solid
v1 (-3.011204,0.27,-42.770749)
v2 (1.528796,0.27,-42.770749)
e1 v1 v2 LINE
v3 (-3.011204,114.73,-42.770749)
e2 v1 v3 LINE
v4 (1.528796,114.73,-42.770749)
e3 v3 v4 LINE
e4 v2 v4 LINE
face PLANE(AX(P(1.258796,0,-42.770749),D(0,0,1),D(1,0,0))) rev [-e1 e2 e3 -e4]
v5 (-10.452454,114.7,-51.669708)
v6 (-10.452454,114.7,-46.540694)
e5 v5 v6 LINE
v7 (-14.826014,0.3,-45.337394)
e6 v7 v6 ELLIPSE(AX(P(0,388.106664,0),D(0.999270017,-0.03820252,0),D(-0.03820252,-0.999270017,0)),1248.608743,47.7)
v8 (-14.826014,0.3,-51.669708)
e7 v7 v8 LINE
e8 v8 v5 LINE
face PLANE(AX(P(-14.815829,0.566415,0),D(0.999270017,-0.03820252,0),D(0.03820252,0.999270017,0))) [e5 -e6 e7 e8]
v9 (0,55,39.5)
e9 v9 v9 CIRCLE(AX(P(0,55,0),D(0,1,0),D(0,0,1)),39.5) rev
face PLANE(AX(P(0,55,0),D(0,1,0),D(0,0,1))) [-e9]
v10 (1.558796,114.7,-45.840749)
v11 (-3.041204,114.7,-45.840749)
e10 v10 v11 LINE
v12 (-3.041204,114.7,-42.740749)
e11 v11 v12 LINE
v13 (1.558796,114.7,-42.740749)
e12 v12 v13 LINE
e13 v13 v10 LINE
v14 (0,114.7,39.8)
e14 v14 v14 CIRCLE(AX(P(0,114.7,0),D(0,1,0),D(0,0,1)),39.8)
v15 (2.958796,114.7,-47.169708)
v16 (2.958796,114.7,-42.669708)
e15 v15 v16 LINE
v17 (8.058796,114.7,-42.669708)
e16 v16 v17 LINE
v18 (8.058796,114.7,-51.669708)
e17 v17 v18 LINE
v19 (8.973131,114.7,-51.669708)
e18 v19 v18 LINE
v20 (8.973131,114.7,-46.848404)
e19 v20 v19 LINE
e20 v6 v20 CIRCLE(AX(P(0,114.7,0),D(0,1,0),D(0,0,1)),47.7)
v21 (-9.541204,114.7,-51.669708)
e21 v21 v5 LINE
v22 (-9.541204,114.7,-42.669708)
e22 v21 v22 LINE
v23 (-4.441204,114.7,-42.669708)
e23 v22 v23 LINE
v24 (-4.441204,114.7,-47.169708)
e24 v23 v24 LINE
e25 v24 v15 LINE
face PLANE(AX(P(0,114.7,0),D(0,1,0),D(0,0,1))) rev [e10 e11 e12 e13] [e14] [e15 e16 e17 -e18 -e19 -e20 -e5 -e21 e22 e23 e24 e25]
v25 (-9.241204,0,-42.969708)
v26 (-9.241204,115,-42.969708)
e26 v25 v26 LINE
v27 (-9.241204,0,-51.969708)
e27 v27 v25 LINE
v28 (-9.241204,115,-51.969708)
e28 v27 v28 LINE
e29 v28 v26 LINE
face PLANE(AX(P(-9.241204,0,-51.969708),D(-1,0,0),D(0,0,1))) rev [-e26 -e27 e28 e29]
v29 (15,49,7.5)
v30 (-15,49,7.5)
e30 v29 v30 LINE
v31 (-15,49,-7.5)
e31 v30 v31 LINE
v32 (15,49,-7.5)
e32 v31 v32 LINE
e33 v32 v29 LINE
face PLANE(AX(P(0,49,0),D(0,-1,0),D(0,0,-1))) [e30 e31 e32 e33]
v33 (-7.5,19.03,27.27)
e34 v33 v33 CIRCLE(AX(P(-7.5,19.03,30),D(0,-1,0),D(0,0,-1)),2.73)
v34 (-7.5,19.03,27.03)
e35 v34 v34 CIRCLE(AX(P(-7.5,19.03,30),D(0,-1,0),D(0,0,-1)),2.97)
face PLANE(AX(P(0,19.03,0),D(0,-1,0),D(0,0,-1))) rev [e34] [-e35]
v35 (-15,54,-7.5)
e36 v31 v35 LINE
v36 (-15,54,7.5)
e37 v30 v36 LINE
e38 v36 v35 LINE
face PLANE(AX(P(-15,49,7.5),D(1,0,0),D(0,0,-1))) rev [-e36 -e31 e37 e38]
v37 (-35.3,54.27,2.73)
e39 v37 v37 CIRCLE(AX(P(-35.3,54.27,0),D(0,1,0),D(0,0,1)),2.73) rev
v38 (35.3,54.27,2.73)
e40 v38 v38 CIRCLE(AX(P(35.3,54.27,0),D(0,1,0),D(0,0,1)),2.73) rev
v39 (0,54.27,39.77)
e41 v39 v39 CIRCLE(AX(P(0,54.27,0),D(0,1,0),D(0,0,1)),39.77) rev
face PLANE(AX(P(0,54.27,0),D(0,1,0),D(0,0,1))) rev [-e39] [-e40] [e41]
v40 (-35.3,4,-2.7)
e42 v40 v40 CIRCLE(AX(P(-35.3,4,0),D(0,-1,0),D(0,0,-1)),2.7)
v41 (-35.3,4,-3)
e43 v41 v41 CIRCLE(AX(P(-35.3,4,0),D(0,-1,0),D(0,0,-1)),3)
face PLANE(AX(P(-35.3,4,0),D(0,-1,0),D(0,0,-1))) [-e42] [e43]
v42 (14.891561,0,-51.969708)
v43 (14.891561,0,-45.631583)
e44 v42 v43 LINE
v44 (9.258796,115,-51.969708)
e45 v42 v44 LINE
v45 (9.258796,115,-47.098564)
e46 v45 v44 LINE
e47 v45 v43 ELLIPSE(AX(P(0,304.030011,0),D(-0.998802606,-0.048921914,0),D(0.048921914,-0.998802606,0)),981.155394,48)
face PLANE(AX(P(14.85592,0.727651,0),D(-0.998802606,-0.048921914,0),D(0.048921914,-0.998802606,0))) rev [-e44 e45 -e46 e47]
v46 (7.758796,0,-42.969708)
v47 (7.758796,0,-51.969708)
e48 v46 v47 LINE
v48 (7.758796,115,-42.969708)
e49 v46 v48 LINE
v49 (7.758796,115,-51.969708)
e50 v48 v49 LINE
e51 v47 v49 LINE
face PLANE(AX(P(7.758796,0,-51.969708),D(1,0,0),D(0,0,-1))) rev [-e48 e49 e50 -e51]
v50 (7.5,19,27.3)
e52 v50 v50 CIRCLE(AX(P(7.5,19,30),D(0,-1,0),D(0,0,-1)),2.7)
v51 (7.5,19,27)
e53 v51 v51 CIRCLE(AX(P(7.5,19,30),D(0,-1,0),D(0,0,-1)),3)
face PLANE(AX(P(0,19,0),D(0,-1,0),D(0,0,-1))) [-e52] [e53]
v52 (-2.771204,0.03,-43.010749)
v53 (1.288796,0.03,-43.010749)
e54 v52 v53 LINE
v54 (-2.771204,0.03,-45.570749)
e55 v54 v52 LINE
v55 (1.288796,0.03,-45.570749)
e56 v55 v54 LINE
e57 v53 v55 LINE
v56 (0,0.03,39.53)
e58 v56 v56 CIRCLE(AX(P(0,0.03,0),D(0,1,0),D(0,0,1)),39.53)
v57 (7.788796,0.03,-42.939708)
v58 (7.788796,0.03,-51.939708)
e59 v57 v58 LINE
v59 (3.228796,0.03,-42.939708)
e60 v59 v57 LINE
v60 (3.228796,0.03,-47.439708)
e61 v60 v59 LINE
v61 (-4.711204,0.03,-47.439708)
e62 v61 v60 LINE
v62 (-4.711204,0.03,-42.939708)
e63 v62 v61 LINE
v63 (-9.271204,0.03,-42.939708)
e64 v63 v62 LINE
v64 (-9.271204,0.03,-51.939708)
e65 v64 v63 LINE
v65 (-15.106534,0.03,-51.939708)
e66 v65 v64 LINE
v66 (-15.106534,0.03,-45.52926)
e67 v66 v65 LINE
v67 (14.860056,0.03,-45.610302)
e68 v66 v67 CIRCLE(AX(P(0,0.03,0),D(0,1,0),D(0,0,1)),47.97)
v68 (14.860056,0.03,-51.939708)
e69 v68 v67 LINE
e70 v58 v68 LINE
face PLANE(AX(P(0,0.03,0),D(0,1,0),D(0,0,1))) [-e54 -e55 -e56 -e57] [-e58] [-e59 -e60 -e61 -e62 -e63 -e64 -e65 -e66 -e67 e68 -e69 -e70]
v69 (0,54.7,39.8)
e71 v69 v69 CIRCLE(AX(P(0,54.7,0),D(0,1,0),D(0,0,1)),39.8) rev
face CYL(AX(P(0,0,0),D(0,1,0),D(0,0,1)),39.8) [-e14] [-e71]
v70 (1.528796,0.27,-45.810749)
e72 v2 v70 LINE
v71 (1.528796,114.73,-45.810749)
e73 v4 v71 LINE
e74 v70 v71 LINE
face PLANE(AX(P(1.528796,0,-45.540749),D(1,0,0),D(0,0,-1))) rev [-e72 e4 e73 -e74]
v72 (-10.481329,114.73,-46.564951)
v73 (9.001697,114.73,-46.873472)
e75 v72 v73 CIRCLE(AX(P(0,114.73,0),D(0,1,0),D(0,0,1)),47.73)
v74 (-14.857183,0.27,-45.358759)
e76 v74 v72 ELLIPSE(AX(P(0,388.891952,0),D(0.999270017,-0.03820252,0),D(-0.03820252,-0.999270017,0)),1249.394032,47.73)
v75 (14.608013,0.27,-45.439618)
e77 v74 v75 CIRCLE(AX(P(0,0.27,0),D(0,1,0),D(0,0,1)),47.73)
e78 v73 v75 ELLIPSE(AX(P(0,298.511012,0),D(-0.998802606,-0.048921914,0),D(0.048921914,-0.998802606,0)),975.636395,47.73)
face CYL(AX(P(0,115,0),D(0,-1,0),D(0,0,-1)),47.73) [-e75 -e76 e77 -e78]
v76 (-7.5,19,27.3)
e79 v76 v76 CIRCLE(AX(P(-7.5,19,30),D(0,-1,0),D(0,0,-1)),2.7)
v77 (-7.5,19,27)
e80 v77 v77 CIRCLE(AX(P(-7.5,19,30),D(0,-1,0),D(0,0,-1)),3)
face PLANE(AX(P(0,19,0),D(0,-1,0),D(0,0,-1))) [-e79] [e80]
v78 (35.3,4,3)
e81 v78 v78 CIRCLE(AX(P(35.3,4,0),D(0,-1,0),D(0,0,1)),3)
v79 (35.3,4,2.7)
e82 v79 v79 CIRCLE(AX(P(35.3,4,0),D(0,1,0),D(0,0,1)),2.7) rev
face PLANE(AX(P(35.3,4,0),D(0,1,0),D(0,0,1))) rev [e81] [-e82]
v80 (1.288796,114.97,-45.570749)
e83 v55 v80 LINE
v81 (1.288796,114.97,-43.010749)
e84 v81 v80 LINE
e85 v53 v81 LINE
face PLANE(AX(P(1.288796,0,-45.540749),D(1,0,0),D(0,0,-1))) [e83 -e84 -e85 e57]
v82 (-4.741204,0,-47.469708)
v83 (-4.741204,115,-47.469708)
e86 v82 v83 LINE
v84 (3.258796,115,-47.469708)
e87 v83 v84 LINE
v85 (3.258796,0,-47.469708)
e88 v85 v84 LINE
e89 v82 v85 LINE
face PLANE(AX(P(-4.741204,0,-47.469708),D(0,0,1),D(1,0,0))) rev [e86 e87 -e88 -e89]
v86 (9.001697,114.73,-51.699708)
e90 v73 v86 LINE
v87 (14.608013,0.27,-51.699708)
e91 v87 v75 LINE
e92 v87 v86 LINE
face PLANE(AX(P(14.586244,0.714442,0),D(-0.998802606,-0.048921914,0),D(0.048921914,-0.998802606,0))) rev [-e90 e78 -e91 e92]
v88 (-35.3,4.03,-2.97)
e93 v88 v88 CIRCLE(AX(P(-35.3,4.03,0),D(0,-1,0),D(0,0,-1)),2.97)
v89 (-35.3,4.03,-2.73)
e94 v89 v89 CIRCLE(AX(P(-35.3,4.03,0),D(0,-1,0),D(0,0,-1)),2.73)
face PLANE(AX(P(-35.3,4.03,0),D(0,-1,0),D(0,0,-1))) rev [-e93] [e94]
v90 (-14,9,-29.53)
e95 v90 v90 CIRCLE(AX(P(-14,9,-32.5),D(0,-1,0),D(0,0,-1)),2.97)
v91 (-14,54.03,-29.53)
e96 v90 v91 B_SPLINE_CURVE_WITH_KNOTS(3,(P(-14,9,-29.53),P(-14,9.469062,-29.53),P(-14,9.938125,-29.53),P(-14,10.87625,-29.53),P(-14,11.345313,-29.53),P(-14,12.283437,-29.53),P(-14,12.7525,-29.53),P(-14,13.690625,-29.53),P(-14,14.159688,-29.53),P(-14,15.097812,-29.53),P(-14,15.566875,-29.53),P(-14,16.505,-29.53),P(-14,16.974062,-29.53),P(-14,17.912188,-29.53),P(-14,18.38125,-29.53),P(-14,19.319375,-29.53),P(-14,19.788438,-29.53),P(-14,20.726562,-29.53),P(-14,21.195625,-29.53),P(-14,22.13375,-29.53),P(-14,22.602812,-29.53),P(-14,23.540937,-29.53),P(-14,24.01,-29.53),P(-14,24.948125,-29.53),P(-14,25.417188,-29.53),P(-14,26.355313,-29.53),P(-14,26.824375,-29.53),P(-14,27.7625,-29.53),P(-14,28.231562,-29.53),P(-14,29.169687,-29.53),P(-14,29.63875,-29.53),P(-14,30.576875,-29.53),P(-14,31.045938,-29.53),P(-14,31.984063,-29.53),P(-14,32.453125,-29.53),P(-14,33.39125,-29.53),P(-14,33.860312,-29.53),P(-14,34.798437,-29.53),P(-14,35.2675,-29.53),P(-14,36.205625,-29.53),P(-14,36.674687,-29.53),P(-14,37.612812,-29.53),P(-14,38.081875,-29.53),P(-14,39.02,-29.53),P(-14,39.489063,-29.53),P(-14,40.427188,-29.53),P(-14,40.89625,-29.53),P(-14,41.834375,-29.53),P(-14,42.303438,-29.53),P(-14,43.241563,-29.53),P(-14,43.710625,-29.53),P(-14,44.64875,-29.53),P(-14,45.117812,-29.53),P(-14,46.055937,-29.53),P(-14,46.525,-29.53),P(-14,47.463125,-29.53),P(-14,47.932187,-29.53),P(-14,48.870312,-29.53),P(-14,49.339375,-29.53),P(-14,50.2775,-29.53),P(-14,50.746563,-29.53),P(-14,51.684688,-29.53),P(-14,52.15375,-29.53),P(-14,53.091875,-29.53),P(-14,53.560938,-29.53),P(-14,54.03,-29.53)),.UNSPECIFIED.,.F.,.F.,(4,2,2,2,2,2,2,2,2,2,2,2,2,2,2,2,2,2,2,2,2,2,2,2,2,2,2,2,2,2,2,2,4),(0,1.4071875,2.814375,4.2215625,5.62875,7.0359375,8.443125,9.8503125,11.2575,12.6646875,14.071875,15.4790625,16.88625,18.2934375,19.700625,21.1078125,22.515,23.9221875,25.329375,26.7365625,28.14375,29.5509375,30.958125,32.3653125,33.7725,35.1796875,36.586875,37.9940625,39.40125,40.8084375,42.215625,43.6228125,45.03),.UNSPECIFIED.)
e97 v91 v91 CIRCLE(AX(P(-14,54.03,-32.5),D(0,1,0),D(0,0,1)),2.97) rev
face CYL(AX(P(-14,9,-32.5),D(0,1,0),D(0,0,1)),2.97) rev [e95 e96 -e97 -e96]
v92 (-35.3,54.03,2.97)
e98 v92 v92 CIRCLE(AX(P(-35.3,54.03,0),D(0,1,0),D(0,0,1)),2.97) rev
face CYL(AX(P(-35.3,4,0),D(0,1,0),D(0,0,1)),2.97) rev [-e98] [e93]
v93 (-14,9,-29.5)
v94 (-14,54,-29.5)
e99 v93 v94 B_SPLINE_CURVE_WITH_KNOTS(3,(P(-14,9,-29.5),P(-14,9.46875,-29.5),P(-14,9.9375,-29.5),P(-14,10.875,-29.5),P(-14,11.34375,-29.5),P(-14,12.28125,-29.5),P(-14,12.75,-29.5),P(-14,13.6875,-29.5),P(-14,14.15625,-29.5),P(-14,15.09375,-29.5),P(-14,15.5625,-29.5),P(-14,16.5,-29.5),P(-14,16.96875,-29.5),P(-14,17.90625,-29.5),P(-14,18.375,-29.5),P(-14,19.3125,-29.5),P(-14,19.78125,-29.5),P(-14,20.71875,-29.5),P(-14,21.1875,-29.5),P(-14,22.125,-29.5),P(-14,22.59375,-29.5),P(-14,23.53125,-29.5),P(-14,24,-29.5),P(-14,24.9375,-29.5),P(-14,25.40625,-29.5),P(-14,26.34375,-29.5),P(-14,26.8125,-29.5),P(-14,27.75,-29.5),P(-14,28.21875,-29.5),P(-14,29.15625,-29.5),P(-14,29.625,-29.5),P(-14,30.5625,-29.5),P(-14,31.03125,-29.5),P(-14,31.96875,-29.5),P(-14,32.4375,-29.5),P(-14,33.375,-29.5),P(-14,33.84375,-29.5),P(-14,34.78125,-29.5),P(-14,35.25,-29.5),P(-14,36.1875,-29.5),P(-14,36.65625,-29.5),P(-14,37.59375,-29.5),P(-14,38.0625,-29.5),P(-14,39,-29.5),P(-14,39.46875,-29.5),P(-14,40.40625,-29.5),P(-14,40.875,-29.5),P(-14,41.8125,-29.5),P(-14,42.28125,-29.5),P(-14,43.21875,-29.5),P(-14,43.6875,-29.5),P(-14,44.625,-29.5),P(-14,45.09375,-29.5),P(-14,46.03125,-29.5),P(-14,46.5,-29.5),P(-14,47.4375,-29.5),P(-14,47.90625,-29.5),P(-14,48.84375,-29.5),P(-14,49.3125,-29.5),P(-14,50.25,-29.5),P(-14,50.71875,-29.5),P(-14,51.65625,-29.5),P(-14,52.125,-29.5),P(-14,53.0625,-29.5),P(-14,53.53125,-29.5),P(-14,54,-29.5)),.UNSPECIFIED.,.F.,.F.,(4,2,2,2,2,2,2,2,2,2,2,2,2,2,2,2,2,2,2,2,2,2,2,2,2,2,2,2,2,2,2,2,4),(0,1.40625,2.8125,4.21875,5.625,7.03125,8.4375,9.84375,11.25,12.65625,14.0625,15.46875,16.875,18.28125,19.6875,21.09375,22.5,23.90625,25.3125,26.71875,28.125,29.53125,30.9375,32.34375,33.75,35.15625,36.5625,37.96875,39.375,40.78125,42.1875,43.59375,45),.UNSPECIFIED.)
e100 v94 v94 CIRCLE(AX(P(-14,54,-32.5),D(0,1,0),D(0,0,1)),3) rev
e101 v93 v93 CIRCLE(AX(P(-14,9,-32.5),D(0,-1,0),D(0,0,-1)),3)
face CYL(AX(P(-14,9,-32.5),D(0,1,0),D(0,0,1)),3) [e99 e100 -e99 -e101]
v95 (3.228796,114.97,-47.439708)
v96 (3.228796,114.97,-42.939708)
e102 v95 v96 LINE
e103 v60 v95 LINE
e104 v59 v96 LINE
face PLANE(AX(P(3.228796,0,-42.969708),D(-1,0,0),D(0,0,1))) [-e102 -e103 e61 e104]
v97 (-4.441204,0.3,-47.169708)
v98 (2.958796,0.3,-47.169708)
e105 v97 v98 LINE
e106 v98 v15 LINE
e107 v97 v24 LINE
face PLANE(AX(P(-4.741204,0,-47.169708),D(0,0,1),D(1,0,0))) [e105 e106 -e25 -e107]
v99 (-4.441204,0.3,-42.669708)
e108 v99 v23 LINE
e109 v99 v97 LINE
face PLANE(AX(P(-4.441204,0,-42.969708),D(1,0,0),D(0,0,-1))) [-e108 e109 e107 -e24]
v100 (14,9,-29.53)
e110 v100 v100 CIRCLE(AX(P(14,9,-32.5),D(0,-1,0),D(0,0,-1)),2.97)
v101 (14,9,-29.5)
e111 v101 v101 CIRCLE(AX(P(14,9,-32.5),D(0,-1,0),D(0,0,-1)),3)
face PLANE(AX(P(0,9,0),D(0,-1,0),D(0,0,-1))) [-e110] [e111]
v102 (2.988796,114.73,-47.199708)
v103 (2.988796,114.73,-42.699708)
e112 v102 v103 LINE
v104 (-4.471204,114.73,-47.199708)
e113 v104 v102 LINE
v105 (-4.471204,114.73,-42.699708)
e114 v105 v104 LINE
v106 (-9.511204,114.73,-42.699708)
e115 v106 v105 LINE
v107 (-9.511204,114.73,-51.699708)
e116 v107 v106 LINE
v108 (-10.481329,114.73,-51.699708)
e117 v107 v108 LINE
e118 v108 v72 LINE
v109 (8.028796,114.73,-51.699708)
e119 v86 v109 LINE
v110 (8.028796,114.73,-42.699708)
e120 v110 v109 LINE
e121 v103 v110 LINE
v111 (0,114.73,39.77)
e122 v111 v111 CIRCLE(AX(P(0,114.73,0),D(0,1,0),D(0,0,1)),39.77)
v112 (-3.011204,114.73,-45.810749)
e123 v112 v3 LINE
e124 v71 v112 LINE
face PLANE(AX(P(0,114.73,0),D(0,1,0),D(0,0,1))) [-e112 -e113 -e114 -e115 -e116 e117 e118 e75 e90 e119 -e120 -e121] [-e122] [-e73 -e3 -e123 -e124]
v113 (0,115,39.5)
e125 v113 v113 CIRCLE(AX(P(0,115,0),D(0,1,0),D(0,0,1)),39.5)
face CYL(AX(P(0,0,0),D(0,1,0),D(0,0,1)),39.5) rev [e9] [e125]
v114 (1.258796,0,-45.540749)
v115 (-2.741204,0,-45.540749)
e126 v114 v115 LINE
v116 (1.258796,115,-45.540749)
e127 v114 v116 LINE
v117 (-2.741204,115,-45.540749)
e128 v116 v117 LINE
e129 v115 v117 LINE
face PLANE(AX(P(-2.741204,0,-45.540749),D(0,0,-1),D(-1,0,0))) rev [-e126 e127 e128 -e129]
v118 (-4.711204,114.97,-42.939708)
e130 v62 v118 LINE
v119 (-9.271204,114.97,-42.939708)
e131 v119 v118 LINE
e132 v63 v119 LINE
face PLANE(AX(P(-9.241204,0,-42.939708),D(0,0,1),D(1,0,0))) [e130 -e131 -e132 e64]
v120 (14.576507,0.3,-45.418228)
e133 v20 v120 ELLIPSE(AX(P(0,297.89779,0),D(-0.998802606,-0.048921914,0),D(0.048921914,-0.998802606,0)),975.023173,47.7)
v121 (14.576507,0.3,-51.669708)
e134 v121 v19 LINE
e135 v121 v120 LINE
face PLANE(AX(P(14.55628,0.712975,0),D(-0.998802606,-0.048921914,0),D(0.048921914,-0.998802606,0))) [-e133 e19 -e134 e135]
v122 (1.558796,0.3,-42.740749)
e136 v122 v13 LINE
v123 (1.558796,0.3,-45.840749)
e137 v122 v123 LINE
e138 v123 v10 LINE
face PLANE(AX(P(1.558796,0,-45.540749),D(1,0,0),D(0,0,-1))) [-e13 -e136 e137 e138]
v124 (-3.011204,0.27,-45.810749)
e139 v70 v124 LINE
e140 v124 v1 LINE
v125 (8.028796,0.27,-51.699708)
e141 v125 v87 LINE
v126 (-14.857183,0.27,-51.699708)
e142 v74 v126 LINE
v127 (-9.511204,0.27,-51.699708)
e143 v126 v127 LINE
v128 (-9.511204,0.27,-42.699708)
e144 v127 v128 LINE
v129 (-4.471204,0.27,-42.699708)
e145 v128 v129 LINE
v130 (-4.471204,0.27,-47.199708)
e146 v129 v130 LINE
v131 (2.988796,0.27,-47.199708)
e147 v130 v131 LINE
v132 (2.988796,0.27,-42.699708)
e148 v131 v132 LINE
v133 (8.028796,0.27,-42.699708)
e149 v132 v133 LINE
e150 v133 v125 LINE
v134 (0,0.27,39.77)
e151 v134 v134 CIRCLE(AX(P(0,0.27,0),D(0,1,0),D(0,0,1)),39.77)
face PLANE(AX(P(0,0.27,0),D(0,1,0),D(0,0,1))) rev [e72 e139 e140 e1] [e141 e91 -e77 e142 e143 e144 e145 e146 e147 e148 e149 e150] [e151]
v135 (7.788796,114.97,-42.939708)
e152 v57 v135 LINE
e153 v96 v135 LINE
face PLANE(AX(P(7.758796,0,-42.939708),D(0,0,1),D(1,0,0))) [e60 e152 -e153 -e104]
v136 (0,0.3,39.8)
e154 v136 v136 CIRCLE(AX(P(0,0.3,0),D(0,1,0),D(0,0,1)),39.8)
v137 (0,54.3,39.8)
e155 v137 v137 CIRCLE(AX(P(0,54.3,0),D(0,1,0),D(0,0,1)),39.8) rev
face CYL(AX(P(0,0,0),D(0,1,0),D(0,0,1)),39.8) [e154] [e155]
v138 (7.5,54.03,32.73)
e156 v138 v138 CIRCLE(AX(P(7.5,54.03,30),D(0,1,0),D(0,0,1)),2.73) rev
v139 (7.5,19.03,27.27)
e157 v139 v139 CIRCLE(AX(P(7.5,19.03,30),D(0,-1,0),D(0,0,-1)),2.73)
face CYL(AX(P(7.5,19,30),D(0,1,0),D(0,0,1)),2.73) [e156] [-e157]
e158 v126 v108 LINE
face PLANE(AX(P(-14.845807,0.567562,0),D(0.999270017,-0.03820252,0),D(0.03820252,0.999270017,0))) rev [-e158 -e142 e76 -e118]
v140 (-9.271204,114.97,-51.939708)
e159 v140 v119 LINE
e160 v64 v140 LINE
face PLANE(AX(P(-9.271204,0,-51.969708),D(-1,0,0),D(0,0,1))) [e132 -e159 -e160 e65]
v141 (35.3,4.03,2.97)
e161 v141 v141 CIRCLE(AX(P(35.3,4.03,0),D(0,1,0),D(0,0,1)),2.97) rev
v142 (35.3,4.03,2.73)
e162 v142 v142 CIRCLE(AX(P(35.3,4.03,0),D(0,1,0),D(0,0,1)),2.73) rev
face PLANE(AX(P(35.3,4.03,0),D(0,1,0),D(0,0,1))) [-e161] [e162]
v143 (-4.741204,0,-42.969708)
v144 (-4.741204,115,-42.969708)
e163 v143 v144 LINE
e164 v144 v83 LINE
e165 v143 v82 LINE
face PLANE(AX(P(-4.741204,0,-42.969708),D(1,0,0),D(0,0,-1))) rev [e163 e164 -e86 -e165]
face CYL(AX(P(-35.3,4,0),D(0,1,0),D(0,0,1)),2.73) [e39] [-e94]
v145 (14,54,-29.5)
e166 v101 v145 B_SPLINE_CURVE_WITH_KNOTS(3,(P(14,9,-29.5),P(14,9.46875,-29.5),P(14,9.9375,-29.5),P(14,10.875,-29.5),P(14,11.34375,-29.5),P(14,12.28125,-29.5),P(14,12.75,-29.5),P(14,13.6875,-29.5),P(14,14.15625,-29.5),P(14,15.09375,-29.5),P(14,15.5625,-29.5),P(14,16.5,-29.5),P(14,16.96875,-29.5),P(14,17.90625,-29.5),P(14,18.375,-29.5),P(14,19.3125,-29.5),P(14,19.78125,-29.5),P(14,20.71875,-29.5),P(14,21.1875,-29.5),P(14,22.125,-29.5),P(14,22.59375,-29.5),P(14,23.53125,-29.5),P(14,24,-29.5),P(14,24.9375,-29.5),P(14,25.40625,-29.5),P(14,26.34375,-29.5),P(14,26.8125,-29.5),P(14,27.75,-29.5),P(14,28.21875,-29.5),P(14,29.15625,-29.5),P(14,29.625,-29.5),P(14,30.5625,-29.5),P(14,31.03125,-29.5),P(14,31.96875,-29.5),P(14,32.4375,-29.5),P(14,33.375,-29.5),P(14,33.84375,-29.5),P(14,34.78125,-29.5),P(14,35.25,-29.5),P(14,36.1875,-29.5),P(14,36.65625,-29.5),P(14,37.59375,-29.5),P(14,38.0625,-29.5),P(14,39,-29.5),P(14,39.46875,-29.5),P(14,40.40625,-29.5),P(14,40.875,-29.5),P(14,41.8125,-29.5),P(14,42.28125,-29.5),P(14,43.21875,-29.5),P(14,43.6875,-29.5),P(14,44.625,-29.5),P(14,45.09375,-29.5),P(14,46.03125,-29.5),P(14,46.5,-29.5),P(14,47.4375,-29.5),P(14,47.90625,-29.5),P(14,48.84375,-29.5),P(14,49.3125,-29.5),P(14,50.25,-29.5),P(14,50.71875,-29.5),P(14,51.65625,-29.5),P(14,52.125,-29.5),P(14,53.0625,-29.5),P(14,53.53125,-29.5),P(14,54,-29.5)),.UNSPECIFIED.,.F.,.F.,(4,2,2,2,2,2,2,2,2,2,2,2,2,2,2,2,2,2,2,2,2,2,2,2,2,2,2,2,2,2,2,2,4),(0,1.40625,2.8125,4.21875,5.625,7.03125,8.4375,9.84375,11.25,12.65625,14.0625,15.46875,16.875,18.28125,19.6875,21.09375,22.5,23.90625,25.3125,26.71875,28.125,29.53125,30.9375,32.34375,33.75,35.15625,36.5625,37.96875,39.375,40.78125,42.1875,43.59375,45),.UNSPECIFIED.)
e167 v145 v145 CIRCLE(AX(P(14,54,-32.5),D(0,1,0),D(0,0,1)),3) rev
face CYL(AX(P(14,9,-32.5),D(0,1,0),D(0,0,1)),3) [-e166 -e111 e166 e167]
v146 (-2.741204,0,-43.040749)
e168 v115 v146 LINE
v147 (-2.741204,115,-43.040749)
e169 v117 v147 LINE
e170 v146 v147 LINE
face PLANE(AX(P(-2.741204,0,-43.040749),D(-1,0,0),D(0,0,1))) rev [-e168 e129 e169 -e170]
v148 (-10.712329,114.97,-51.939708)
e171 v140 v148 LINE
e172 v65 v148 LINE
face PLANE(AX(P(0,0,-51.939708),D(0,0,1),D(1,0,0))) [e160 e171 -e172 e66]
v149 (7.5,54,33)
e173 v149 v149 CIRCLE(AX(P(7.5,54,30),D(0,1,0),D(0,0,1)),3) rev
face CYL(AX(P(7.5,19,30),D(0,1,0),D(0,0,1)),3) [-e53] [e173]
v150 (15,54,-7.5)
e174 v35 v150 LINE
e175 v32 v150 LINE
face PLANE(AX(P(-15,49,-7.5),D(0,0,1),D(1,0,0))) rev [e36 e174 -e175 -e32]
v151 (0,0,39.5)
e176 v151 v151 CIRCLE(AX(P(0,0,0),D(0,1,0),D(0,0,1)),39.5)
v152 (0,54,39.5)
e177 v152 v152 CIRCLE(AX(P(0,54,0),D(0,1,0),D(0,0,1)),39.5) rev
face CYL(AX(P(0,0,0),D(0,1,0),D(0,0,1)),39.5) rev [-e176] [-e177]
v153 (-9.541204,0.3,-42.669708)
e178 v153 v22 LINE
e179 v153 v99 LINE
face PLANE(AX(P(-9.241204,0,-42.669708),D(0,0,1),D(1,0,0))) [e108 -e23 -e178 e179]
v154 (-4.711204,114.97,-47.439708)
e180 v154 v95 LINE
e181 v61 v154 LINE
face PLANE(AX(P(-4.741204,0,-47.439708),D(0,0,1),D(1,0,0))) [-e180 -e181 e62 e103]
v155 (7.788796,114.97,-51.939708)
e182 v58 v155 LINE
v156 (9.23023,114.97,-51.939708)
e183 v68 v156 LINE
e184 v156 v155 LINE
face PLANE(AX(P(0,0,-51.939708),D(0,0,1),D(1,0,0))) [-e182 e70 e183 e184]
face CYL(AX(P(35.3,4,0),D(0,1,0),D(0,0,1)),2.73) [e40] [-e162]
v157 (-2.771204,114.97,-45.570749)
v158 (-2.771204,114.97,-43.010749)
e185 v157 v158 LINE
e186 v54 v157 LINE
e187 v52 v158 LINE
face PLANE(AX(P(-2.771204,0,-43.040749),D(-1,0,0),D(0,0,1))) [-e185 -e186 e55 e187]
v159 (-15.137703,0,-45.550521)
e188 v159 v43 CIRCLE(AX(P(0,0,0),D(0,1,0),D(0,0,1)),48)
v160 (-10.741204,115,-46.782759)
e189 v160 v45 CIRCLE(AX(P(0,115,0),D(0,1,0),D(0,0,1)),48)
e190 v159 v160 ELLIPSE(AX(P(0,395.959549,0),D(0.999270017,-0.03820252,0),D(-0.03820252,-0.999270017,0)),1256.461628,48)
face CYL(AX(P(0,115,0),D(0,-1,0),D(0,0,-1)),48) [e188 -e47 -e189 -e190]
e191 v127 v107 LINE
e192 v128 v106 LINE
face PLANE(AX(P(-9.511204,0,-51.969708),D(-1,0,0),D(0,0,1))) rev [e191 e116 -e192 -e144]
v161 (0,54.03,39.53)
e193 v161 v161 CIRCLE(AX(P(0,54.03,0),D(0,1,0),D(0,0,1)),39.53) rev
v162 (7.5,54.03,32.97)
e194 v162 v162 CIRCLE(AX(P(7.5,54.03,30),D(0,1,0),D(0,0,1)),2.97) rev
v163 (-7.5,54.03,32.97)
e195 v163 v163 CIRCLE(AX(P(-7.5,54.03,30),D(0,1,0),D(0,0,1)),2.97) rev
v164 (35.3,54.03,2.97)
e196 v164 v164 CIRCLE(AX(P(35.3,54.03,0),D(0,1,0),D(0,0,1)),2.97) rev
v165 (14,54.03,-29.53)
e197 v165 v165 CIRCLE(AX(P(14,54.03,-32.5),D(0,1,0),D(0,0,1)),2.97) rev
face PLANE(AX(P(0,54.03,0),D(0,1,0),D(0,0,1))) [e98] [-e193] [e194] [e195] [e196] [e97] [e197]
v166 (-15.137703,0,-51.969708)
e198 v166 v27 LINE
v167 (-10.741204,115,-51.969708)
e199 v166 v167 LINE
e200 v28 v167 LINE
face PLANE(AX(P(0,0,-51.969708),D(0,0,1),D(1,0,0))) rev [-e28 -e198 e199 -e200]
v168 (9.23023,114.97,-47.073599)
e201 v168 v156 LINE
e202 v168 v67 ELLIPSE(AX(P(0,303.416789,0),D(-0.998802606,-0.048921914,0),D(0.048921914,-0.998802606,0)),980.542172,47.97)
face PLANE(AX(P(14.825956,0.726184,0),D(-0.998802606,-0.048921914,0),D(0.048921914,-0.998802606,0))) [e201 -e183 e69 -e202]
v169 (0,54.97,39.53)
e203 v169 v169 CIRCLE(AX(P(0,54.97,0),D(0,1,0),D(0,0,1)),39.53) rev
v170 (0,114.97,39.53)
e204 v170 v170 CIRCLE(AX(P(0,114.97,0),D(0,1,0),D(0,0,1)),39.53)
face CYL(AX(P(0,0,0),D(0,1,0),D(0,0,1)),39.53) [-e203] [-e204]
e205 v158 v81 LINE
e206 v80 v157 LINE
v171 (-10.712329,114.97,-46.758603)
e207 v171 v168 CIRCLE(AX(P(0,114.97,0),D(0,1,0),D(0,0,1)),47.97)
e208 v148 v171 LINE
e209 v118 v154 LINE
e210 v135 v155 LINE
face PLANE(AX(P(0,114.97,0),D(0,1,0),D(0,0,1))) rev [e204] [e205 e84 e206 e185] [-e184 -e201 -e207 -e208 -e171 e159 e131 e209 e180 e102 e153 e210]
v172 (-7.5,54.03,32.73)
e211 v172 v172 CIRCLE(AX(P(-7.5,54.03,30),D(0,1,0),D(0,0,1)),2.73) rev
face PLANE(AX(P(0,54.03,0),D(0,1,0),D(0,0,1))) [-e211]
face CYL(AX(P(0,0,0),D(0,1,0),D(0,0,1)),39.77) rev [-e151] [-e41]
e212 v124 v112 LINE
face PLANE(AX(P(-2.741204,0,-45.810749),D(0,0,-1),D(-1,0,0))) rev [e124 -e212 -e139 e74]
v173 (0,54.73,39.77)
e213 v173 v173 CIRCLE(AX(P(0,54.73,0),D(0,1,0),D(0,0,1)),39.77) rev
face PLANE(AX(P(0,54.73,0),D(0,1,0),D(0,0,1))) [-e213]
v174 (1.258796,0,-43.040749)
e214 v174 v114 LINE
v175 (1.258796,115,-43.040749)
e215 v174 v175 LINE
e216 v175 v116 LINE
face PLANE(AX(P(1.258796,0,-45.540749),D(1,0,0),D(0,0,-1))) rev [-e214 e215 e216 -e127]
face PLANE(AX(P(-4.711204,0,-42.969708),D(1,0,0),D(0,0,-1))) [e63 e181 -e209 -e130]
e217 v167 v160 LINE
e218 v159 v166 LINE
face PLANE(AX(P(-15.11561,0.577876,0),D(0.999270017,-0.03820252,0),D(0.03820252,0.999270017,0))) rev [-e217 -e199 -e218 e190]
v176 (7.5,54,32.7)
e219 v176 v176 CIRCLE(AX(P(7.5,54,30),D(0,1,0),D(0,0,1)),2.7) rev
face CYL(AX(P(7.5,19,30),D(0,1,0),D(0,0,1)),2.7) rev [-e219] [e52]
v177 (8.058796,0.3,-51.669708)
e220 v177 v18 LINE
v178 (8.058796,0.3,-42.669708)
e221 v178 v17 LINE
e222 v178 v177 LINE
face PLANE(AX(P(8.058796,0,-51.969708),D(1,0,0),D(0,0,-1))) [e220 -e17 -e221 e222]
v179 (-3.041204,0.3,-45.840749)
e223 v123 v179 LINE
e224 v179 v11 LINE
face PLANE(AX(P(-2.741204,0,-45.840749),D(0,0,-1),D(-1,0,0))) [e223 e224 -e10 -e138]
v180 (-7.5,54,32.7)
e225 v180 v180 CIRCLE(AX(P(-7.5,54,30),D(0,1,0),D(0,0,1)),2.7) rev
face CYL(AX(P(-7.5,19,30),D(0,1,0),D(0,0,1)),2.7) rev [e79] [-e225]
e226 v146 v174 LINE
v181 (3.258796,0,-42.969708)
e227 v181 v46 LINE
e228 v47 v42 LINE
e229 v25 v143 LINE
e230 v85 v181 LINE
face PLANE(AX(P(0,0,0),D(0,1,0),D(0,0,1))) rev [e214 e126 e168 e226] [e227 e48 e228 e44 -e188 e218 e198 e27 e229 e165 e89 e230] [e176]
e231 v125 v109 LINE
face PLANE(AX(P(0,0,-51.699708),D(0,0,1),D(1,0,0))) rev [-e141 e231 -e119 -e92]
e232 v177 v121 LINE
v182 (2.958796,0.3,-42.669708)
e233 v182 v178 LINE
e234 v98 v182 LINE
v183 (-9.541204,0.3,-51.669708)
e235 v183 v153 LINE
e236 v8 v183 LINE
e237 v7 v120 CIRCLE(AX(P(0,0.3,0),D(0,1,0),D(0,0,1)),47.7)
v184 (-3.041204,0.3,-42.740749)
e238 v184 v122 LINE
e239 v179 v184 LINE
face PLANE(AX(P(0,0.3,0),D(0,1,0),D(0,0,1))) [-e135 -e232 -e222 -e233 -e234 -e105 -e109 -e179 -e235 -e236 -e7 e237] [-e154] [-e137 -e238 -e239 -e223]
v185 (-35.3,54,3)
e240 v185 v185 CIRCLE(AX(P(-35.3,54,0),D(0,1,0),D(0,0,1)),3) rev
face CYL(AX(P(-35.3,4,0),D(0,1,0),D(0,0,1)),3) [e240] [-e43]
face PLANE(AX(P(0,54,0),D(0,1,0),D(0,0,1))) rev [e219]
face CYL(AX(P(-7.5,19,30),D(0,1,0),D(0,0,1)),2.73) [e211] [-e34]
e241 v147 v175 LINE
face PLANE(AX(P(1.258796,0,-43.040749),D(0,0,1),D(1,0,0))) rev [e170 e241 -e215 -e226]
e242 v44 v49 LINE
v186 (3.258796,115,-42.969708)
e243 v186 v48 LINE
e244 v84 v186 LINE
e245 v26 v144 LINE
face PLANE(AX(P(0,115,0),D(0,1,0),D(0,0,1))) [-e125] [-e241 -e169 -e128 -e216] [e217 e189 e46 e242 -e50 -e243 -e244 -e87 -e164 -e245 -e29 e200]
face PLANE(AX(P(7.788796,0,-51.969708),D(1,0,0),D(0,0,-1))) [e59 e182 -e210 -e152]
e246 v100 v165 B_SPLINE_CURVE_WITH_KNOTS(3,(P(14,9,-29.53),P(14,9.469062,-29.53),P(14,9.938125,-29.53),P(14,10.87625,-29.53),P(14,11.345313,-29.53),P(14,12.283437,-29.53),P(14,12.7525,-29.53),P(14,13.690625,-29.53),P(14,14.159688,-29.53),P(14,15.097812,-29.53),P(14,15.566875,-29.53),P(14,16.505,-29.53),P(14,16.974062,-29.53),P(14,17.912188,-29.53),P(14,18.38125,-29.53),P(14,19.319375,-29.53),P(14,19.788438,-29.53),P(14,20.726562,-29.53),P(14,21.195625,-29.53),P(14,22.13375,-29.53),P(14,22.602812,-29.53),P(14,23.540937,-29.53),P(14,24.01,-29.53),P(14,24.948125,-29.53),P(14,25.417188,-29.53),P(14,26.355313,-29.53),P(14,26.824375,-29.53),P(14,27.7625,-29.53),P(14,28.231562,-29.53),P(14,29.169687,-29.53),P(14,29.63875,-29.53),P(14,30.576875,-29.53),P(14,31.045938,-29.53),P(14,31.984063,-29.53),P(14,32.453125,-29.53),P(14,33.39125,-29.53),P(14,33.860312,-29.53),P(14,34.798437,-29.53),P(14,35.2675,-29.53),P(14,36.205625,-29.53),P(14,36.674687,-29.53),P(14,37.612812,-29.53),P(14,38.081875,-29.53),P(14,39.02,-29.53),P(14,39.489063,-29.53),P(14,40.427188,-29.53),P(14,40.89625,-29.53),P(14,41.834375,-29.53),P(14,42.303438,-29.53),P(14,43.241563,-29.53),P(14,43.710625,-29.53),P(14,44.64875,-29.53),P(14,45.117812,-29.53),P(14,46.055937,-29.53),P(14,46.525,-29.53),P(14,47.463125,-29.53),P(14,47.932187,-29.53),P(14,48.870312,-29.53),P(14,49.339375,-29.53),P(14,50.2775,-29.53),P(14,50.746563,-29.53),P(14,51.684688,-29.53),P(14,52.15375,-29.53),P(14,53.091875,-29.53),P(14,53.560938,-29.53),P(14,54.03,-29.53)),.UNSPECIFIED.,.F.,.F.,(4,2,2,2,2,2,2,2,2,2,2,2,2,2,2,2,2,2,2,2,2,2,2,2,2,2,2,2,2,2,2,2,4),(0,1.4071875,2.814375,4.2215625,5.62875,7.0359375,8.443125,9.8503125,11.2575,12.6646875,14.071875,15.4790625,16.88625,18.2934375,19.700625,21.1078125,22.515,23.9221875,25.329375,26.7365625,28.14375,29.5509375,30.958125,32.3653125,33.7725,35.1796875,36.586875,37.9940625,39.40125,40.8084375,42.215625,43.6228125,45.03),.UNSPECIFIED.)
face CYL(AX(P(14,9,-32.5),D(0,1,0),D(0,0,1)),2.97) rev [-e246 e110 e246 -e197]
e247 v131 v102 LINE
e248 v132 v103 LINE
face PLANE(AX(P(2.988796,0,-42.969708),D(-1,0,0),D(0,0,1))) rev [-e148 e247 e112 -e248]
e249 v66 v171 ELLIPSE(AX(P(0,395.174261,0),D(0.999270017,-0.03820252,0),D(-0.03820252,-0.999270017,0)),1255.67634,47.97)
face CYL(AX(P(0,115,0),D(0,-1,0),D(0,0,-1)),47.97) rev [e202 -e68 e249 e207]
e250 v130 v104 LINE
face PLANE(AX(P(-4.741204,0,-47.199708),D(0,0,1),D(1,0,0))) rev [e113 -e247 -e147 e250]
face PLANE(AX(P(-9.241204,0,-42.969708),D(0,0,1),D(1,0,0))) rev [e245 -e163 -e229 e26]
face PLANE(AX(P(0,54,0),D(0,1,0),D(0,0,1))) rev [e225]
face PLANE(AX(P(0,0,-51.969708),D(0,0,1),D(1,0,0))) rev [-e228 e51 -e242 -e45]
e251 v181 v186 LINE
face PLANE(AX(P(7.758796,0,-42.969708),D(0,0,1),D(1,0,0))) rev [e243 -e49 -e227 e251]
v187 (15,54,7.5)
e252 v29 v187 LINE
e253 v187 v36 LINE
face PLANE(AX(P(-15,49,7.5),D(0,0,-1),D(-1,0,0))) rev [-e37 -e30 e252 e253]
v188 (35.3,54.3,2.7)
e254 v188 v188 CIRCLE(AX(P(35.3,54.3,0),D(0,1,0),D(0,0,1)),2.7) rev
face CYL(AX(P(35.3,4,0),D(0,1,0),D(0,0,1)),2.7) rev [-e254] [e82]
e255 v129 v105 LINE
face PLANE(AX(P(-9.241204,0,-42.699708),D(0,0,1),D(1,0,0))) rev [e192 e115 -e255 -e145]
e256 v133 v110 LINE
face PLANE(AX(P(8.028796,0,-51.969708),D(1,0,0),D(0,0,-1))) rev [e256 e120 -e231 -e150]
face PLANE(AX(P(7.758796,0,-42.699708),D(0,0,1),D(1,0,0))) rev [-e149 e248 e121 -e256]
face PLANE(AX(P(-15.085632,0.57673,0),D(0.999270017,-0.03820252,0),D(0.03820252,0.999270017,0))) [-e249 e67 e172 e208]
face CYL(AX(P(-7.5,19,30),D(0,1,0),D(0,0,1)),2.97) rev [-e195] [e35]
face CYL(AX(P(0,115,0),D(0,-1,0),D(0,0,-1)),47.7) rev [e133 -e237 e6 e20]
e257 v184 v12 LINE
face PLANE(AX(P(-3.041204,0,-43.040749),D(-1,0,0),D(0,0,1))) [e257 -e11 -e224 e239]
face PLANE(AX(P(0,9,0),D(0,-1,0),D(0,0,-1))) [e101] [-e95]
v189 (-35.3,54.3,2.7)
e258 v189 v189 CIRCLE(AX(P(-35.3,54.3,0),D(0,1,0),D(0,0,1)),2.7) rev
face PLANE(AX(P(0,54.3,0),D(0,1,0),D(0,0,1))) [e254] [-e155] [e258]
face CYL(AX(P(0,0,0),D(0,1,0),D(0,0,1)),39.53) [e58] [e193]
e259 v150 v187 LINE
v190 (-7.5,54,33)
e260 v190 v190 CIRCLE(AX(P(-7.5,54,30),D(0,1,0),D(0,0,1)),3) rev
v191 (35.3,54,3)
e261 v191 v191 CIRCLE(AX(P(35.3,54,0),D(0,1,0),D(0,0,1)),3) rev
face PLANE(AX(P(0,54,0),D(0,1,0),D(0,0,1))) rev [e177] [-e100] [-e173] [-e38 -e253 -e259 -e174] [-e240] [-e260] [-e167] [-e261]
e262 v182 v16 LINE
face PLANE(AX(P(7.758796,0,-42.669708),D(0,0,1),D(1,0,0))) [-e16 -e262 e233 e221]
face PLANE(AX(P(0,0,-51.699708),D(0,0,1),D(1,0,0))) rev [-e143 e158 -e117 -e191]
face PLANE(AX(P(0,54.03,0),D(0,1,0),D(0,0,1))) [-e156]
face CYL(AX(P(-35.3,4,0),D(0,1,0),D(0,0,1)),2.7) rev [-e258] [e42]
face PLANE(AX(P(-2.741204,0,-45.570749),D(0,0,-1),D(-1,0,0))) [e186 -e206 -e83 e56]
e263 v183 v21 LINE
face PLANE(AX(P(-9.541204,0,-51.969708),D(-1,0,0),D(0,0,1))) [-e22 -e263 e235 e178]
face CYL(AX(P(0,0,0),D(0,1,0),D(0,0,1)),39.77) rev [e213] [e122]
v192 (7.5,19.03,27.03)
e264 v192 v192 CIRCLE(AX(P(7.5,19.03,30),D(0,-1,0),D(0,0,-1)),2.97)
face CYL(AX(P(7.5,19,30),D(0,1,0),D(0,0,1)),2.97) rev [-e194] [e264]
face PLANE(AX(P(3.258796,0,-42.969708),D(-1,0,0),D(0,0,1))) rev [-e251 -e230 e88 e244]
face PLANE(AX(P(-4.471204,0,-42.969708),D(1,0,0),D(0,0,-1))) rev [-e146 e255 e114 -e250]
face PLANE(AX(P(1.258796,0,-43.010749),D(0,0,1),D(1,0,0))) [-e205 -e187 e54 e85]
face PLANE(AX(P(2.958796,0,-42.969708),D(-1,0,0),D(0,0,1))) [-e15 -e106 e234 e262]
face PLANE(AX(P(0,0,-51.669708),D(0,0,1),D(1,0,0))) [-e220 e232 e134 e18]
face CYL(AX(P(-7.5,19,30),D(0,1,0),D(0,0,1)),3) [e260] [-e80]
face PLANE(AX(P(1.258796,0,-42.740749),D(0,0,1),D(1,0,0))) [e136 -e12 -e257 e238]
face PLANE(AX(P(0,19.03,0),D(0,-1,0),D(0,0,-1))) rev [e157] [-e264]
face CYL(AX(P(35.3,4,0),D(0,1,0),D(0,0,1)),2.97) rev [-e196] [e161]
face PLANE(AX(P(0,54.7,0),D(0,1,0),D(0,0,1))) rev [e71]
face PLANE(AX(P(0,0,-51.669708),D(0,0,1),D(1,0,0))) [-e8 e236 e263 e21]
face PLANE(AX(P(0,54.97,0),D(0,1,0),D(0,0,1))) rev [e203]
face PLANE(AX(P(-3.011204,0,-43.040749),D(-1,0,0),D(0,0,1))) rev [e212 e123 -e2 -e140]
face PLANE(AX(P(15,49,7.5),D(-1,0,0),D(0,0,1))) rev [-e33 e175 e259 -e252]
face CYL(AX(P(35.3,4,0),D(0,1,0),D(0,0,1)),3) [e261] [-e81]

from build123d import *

# Parameters (mm, degrees)
SKETCH1_R           = 48
BOSS_EXTRUDE1_DEPTH = 115
SKETCH2_R           = 39.5
CUT_EXTRUDE3_DEPTH  = 115
SKETCH9_W           = 4.5
SKETCH9_H           = 9
CUT_EXTRUDE5_DEPTH  = 115
SKETCH14_W          = 4
SKETCH14_H          = 2.5
CUT_EXTRUDE8_DEPTH  = 115
SKETCH16_W          = 8
SKETCH16_H          = 4.5
CUT_EXTRUDE9_DEPTH  = 115
SKETCH19_R          = 41
BOSS_EXTRUDE2_DEPTH = 1
SKETCH21_R          = 3
BOSS_EXTRUDE3_DEPTH = 50
SHELL1_T            = -0.3
SKETCH24_R          = 3
BOSS_EXTRUDE4_DEPTH = 35
SHELL2_START        = 19
SHELL2_OUTLINE_R    = 2.7
SHELL2_DEPTH        = 35
SKETCH25_R          = 3
BOSS_EXTRUDE5_DEPTH = 45
SHELL5_T            = -0.03
SKETCH26_W          = 30
SKETCH26_H          = 15
BOSS_EXTRUDE6_DEPTH = 5


# Read off the part's stored shape, not the designer's step: Shell2
with BuildPart() as part:
    # Sketch1 → Boss-Extrude1 (new body)
    with BuildSketch(Plane(origin=(0, 0, 0), x_dir=(1, 0, 0), z_dir=(0, 1, 0))):
        with Locations(Location((0, 0, 0), (0, 0, 270))):
            Circle(SKETCH1_R)
    extrude(amount=BOSS_EXTRUDE1_DEPTH)

    # Sketch7 → Loft2 section 0
    with BuildSketch(Plane.XZ):
        with BuildLine():
            Line((-15.1377027, -38.271634302), (14.891561193, -38.271634302))
            Line((14.891561193, -38.271634302), (14.891561193, -51.96970786))
            Line((14.891561193, -51.96970786), (-15.1377027, -51.96970786))
            Line((-15.1377027, -51.96970786), (-15.1377027, -38.271634302))
        make_face()
    # Sketch6 → Loft2 section 1
    with BuildSketch(Plane(origin=(0, 115, 0), x_dir=(1, 0, 0), z_dir=(0, 1, 0))):
        with BuildLine():
            Line((-10.741203576, 39.96970786), (9.258796424, 39.96970786))
            Line((9.258796424, 39.96970786), (9.258796424, 51.96970786))
            Line((9.258796424, 51.96970786), (-10.741203576, 51.96970786))
            Line((-10.741203576, 51.96970786), (-10.741203576, 39.96970786))
        make_face()
    loft()

    # Sketch2 → Cut-Extrude3 (cut)
    with BuildSketch(Plane(origin=(0, 115, 0), x_dir=(1, 0, 0), z_dir=(0, 1, 0))):
        with Locations(Location((0, 0, 0), (0, 0, 270))):
            Circle(SKETCH2_R)
    extrude(amount=-CUT_EXTRUDE3_DEPTH, mode=Mode.SUBTRACT)

    # Sketch9 → Cut-Extrude5 (cut)
    with BuildSketch(Plane(origin=(0, 115, 0), x_dir=(1, 0, 0), z_dir=(0, 1, 0))):
        with Locations((-6.991203576, 47.46970786)):
            Rectangle(SKETCH9_W, SKETCH9_H)
        with Locations((5.508796424, 47.46970786)):
            Rectangle(SKETCH9_W, SKETCH9_H)
    extrude(amount=-CUT_EXTRUDE5_DEPTH, mode=Mode.SUBTRACT)

    # Sketch14 → Cut-Extrude8 (cut)
    with BuildSketch(Plane(origin=(0, 115, 0), x_dir=(1, 0, 0), z_dir=(0, 1, 0))):
        with Locations((-0.741203576, 44.290749204)):
            Rectangle(SKETCH14_W, SKETCH14_H)
    extrude(amount=-CUT_EXTRUDE8_DEPTH, mode=Mode.SUBTRACT)

    # Sketch16 → Cut-Extrude9 (cut)
    with BuildSketch(Plane(origin=(0, 115, 0), x_dir=(1, 0, 0), z_dir=(0, 1, 0))):
        with Locations((-0.741203576, 49.71970786)):
            Rectangle(SKETCH16_W, SKETCH16_H)
    extrude(amount=-CUT_EXTRUDE9_DEPTH, mode=Mode.SUBTRACT)

    # Sketch19 → Boss-Extrude2 (add)
    with BuildSketch(Plane(origin=(0, 54, 0), x_dir=(1, 0, 0), z_dir=(0, 1, 0))):
        Circle(SKETCH19_R)
    extrude(amount=BOSS_EXTRUDE2_DEPTH)

    # Sketch21 → Boss-Extrude3 (add)
    with BuildSketch(Plane.XZ.offset(-54)):
        with Locations(Location((-35.3, 0, 0), (0, 0, 90))):
            Circle(SKETCH21_R)
        with Locations(Location((35.3, 0, 0), (0, 0, 90))):
            Circle(SKETCH21_R)
    extrude(amount=BOSS_EXTRUDE3_DEPTH)

    # Shell1
    shell1_openings = [part.faces().sort_by_distance(p)[0] for p in [
        (-35.3, 4, 0),
        (35.3, 4, 0),
    ]]
    offset(amount=SHELL1_T, openings=shell1_openings, kind=Kind.INTERSECTION)

    # Sketch24 → Boss-Extrude4 (add)
    with BuildSketch(Plane.XZ.offset(-54)):
        with Locations(Location((7.5, 30, 0), (0, 0, 90))):
            Circle(SKETCH24_R)
        with Locations(Location((-7.5, 30, 0), (0, 0, 90))):
            Circle(SKETCH24_R)
    extrude(amount=BOSS_EXTRUDE4_DEPTH)

    # Shell2 outline → Shell2 (cut)
    with BuildSketch(Plane(origin=(0, 0, 0), x_dir=(1, 0, 0), z_dir=(0, 1, 0)).offset(SHELL2_START)):
        with Locations((-7.5, -30)):
            Circle(SHELL2_OUTLINE_R)
        with Locations((7.5, -30)):
            Circle(SHELL2_OUTLINE_R)
    extrude(amount=SHELL2_DEPTH, mode=Mode.SUBTRACT)

    # Sketch25 → Boss-Extrude5 (add)
    with BuildSketch(Plane.XZ.offset(-54)):
        with Locations(Location((14, -32.5, 0), (0, 0, 90))):
            Circle(SKETCH25_R)
        with Locations(Location((-14, -32.5, 0), (0, 0, 90))):
            Circle(SKETCH25_R)
    extrude(amount=BOSS_EXTRUDE5_DEPTH)

    # Shell5
    shell5_openings = [part.faces().sort_by_distance(p)[0] for p in [
        (-14, 9, -32.5),
        (14, 9, -32.5),
    ]]
    offset(amount=SHELL5_T, openings=shell5_openings, kind=Kind.INTERSECTION)

    # Sketch26 → Boss-Extrude6 (add)
    with BuildSketch(Plane.XZ.offset(-54)):
        Rectangle(SKETCH26_W, SKETCH26_H)
    extrude(amount=BOSS_EXTRUDE6_DEPTH)


solid = part.part
